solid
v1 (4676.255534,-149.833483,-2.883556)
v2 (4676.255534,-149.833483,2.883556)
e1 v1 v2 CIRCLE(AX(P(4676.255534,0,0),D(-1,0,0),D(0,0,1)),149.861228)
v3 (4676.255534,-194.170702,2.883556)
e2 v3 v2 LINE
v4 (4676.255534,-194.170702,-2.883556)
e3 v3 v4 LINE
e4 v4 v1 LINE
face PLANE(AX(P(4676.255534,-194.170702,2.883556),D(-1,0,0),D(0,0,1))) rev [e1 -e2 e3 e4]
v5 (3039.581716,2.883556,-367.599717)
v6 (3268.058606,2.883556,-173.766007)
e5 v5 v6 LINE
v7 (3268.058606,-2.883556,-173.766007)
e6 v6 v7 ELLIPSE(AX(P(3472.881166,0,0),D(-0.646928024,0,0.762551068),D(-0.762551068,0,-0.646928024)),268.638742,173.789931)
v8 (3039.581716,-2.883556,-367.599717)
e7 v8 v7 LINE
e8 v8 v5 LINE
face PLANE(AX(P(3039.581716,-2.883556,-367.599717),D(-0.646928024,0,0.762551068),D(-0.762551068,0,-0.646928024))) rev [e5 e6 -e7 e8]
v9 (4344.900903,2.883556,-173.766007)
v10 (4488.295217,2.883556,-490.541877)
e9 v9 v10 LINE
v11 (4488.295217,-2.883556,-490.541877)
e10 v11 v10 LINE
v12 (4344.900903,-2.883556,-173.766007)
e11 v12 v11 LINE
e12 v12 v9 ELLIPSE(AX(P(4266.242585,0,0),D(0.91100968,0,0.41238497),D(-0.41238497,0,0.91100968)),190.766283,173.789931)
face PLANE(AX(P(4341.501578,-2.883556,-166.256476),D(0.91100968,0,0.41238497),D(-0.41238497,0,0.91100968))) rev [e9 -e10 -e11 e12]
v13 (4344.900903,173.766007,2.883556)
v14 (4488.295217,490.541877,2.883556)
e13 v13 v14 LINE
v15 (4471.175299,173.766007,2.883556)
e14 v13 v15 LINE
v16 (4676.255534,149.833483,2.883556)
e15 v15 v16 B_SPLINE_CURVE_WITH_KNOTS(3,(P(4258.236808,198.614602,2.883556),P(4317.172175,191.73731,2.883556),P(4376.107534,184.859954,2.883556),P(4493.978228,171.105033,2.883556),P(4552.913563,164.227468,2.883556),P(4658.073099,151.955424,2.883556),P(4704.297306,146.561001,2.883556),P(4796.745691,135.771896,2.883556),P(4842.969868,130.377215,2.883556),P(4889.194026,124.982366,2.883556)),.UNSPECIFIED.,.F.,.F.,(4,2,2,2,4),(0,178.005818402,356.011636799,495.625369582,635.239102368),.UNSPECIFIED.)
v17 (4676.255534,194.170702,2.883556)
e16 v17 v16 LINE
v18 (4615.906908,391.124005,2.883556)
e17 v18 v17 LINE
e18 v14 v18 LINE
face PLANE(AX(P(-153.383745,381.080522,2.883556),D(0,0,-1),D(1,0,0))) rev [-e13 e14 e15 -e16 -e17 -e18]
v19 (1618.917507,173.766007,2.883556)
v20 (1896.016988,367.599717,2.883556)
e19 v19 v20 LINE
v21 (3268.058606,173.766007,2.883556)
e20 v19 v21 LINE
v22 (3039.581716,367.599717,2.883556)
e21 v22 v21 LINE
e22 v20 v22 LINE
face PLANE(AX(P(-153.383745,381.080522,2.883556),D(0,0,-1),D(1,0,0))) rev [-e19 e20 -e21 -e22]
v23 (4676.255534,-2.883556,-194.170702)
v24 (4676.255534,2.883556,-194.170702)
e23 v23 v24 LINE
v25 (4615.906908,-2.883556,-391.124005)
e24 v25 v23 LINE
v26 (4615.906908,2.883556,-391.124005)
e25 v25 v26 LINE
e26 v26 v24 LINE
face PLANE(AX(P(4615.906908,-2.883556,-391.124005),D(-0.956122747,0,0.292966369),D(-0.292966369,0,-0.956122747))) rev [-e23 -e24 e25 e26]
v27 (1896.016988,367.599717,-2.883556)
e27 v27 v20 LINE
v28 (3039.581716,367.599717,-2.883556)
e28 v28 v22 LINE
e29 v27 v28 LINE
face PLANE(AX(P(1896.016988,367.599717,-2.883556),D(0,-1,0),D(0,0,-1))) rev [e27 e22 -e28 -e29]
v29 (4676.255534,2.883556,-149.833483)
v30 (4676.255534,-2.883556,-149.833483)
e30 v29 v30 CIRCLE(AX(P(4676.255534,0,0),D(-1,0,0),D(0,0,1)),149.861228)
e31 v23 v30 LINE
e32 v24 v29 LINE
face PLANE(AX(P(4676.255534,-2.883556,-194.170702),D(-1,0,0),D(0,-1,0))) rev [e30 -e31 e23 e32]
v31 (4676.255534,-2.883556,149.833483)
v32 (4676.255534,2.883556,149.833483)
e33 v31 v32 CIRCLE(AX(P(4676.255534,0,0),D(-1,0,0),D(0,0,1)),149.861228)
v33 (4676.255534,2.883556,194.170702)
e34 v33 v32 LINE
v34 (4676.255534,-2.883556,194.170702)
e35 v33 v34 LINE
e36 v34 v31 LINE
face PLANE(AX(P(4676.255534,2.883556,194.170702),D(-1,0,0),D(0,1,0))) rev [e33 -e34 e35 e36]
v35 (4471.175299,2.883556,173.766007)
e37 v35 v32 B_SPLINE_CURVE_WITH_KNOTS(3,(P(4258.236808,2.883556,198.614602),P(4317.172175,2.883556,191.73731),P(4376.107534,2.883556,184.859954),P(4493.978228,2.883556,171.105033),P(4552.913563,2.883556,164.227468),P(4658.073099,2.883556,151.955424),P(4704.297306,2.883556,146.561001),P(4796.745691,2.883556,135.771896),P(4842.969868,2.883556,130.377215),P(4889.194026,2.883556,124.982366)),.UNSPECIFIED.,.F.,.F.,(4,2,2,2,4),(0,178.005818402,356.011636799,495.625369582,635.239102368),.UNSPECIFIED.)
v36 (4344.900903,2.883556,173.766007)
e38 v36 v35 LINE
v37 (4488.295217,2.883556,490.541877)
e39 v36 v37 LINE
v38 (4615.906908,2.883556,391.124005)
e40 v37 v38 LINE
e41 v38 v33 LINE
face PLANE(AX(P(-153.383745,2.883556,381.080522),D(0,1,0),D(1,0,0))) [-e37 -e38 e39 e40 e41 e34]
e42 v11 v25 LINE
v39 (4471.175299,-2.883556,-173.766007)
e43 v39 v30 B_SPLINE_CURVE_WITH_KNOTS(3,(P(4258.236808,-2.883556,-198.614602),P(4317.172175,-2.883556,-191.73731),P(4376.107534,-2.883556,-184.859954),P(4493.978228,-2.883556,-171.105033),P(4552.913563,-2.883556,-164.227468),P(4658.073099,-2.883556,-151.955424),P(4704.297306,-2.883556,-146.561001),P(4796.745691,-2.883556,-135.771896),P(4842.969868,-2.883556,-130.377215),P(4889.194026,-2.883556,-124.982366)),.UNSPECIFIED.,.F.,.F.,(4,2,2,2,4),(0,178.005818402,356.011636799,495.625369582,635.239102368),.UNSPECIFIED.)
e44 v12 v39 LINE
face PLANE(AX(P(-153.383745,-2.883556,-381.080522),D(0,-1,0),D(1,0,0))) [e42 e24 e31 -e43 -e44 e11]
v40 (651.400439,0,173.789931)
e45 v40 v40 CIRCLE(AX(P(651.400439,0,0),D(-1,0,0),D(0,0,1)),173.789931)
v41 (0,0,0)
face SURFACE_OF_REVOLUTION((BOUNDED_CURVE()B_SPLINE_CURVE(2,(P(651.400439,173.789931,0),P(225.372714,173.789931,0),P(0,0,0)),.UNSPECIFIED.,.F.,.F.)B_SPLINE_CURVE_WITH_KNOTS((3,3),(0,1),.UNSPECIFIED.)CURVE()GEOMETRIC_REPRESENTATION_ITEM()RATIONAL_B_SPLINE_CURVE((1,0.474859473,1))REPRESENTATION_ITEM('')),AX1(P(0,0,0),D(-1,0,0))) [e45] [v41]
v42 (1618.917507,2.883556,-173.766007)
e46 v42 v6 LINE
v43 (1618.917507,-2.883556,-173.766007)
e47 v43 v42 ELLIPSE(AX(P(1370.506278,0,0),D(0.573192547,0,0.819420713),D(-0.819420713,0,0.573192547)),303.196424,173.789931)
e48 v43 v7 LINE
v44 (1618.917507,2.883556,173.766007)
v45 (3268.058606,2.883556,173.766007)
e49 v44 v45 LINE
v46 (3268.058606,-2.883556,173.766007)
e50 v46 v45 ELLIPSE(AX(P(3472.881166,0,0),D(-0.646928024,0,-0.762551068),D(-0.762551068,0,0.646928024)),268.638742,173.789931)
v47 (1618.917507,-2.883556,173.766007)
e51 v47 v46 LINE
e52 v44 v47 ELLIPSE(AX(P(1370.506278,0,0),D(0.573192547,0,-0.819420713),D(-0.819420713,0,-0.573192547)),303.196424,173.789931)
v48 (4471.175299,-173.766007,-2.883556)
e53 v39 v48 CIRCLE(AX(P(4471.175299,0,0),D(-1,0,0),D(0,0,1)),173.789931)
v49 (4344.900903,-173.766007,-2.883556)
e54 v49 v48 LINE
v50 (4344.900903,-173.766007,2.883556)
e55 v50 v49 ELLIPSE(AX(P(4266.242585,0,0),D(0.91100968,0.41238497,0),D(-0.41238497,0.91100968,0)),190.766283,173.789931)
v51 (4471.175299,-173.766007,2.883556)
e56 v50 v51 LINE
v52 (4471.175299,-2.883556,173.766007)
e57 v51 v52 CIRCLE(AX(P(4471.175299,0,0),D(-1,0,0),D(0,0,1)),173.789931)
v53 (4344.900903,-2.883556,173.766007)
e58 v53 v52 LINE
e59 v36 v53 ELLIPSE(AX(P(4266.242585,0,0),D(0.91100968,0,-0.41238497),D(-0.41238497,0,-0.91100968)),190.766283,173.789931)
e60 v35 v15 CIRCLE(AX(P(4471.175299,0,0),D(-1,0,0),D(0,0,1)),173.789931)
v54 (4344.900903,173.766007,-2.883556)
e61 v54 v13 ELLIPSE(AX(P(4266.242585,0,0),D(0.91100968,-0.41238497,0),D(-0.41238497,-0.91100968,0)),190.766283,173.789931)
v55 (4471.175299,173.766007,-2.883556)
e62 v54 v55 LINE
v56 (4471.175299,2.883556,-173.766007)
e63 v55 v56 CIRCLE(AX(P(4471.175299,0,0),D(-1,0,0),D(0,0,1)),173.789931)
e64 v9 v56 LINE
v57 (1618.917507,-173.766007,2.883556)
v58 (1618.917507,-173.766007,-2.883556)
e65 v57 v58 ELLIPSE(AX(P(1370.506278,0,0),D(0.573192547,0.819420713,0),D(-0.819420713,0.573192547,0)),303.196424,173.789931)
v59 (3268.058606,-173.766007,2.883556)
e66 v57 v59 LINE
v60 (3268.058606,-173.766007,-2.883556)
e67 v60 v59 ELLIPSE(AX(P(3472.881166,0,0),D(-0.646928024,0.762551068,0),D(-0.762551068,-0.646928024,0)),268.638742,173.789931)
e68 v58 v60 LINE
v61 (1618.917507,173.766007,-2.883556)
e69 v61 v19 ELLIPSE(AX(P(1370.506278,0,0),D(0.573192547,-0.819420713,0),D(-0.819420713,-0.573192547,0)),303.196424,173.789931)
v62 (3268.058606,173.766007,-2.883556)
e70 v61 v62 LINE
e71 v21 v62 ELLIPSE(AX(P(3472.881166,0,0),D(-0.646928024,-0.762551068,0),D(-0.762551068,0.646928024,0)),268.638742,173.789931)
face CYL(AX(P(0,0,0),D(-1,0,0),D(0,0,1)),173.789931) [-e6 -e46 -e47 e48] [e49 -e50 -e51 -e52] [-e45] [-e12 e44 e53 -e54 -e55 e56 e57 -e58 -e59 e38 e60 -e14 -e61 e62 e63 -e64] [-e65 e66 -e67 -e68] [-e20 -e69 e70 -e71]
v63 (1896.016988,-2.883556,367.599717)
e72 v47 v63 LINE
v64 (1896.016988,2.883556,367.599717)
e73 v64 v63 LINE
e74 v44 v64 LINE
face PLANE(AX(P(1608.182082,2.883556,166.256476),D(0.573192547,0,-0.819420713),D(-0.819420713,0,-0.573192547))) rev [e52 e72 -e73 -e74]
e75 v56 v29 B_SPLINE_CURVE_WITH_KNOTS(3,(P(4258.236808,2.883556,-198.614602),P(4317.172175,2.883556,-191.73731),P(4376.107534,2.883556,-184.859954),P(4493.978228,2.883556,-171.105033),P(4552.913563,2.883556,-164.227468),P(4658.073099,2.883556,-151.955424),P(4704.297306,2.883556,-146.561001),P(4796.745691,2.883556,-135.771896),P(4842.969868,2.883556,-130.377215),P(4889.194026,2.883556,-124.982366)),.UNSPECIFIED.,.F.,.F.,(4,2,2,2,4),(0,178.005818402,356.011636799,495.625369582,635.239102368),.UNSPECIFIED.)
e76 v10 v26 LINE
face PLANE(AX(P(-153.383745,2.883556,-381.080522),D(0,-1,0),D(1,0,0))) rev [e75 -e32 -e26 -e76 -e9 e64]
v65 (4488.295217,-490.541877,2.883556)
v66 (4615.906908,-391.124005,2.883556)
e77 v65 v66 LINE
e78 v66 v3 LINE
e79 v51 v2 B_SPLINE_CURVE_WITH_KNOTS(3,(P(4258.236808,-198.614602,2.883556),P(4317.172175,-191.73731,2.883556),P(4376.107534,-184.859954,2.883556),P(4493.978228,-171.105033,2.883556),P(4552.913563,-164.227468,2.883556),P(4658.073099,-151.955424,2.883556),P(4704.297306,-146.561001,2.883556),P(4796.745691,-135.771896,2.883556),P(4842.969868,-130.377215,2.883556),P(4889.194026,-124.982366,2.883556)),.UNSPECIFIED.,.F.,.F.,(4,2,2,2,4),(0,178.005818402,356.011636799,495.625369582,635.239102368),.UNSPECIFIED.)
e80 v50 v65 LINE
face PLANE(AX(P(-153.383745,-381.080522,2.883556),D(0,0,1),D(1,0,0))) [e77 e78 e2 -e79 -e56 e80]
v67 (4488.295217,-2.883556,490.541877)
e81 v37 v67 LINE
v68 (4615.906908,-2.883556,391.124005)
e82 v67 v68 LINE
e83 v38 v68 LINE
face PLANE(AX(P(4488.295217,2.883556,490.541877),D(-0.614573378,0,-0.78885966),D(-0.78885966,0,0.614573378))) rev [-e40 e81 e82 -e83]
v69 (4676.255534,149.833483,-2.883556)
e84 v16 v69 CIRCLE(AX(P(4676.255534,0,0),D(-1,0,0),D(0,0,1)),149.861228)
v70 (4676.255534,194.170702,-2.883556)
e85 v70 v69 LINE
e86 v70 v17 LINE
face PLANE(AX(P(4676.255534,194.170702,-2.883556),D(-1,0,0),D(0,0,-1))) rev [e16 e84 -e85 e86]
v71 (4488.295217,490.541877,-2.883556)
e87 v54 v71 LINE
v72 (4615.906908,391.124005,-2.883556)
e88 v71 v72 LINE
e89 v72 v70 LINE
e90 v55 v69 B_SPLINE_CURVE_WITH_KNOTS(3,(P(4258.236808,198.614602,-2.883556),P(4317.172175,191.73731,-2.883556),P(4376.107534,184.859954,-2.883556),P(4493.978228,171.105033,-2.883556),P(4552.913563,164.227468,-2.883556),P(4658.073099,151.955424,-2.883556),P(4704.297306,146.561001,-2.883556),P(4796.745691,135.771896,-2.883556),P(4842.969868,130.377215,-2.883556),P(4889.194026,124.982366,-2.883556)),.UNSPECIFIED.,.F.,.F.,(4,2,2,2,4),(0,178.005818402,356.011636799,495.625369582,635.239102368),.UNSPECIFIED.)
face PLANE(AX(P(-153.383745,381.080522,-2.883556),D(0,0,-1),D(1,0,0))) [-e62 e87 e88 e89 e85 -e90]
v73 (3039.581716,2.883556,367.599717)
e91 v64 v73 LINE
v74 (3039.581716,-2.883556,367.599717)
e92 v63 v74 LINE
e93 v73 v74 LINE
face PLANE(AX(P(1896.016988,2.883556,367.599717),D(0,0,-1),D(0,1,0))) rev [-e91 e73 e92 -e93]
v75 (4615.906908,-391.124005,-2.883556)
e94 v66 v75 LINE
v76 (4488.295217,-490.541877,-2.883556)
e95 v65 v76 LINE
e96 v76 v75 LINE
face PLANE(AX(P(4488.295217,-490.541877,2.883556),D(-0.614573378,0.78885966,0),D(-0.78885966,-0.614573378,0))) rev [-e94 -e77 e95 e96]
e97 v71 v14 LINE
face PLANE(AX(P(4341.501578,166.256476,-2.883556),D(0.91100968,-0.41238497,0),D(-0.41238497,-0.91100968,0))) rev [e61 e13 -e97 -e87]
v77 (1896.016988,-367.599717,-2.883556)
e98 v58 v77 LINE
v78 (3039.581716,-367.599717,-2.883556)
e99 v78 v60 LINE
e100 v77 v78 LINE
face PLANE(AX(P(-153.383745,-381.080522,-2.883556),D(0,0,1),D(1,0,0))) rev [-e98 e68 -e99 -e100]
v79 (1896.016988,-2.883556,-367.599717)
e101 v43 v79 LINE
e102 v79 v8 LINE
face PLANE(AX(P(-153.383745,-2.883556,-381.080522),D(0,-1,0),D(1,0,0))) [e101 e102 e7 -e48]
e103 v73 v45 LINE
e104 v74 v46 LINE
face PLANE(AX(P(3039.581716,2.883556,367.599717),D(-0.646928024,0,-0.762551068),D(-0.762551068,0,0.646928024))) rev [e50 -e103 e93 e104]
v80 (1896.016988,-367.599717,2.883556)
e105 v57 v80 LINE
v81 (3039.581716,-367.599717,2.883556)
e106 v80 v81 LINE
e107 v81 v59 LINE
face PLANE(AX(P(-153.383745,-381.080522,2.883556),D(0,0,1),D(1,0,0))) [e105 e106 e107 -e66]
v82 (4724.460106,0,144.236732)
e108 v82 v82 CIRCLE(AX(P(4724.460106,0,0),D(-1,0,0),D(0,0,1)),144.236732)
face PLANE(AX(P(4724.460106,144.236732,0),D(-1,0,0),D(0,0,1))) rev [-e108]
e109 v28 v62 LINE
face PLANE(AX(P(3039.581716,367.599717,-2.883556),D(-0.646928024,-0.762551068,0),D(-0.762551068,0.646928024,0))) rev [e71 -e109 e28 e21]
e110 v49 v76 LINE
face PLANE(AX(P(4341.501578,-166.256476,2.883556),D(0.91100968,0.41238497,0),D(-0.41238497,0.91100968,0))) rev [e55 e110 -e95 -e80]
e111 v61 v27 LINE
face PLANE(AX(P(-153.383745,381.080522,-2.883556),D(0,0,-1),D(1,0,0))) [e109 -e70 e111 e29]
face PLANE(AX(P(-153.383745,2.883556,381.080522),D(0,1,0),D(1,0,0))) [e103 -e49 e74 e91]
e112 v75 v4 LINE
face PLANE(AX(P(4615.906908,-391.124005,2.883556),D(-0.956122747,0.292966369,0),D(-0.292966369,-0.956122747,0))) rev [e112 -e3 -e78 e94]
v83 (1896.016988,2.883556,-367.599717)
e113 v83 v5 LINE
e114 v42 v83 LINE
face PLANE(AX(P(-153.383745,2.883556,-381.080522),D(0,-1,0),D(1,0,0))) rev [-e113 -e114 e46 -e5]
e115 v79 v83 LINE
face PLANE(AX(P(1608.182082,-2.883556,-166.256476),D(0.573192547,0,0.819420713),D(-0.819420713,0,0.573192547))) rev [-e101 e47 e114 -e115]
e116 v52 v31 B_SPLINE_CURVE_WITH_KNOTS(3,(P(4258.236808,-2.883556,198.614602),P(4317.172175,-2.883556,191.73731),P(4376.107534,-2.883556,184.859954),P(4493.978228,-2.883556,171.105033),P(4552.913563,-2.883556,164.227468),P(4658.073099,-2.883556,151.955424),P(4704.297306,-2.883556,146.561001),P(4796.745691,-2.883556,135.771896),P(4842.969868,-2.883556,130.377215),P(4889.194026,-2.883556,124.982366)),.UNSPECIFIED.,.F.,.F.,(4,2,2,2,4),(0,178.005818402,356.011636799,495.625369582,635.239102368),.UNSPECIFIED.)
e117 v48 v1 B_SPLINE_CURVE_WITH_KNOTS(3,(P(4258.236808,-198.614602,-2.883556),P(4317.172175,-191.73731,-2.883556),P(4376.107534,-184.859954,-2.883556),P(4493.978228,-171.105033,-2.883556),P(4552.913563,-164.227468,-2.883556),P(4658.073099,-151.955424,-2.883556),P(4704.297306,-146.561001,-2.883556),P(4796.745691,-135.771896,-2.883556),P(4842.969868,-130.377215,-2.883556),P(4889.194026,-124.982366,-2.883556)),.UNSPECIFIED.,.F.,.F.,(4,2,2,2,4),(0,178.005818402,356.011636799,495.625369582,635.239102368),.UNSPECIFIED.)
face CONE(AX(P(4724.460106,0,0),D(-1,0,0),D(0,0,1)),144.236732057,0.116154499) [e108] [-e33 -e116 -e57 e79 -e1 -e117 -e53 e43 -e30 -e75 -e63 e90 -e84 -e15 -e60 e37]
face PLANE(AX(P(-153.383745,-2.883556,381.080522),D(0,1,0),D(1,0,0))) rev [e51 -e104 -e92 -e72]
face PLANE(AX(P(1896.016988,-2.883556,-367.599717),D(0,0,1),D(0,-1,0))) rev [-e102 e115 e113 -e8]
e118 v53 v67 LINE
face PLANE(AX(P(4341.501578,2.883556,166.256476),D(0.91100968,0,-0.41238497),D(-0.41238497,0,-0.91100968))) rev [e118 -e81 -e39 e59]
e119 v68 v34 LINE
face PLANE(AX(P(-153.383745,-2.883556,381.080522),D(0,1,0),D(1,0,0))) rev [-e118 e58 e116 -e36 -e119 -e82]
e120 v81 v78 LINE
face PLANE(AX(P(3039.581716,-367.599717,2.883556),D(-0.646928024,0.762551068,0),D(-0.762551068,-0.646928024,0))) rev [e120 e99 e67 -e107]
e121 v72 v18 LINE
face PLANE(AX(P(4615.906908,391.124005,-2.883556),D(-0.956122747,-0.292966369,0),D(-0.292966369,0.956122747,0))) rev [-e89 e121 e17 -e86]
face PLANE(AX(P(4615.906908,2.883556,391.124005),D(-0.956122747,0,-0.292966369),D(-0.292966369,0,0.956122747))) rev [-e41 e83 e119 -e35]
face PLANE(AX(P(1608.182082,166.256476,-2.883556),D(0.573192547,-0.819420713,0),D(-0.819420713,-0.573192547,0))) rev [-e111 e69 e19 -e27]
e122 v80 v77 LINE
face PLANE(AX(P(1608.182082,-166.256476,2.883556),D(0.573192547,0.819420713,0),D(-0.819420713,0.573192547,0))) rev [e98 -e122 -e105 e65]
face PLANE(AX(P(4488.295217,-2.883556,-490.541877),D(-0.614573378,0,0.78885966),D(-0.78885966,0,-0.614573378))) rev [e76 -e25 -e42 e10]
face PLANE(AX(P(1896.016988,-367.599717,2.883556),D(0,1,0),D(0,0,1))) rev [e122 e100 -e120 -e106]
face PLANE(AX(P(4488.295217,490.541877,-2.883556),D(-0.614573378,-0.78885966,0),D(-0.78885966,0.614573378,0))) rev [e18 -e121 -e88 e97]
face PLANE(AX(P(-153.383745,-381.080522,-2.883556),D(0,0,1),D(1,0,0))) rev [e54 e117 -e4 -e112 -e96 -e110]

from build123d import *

# Parameters (mm, degrees)
BOSS_EXTRUDE1_DEPTH   = 0.545404963
BOSS_EXTRUDE1_2_DEPTH = 0.545404963
SCALE2_SCALE          = 5.287
CIRPATTERN1_START     = 378.196965722
CIRPATTERN1_DEPTH     = 5.767112081
CIRPATTERN1_START_2   = -2.88355604
CIRPATTERN1_2_DEPTH   = 5.76711208


with BuildPart() as part:
    # Sketch1 → Revolve1 (revolve)
    with BuildSketch(Plane.XY, mode=Mode.PRIVATE) as revolve1_sk:
        with BuildLine():
            Line((152.219440928, 104.949962647), (874.703810113, 104.949962647))
            Line((874.703810113, 104.949962647), (922.610904161, 99.360176626))
            Line((922.610904161, 99.360176626), (922.610904161, 72.078782251))
            Line((922.610904161, 72.078782251), (29.011489455, 72.078782251))
            add(Edge.make_bspline(
                [(29.011489455, 72.078782251), (71.639201594, 104.949962647), (152.219440928, 104.949962647)],
                knots=[0, 0, 0, 1, 1, 1], degree=2, weights=[1, 0.474859473, 1]))
        make_face()
    revolve(revolve1_sk.sketch.rotate(Axis((29.011489455, 72.078782251, 0), (1, 0, 0)), 90), axis=Axis((29.011489455, 72.078782251, 0), (1, 0, 0)))


with BuildPart() as body_2:
    # Sketch2 → Boss-Extrude1 (new, symmetric)
    with BuildSketch(Plane.XY):
        Polygon((850.176909973, 50.048019845), (913.4933382, 50.048019845), (913.4933382, 35.352717878), (902.078807117, -1.899656367), (877.941925748, -20.703868936), (850.176909973, 40.632503532), align=None)
    extrude(amount=BOSS_EXTRUDE1_DEPTH, both=True)


with BuildPart() as body_3:
    # Sketch2 → Boss-Extrude1 2 (new, symmetric)
    with BuildSketch(Plane.XY):
        Polygon((333.188164698, 40.632503532), (387.630174448, 2.549802235), (603.927645349, 2.549802235), (648.816726438, 40.632503532), (648.816726438, 50.048019845), (333.188164698, 50.048019845), align=None)
    extrude(amount=BOSS_EXTRUDE1_2_DEPTH, both=True)


with BuildPart() as part_1:
    # Scale2: scaled about (0, 0, 0)
    add(part.part.scale(SCALE2_SCALE))

    # CirPattern1: read off the stored shape, not the designer's step
    # CirPattern1 outline → CirPattern1 (add)
    with BuildSketch(Plane(origin=(0, 0, 0), x_dir=(1, 0, 0), z_dir=(0, 1, 0)).offset(CIRPATTERN1_START)):
        Polygon((4419.626329355, 0), (4641.678961432, -490.541876827), (4769.290653226, -391.124004973), (4829.639279064, -194.170702341), (4829.639279064, 194.170702341), (4769.290653226, 391.124004973), (4641.678961432, 490.541876827), align=None)
        Polygon((3192.965460961, -367.599717344), (3626.264910808, 0), (3192.965460961, 367.599717344), (2049.400732307, 367.599717344), (1772.301251505, 173.766006848), (1771, 172.8557691), (1771, -172.8557691), (1772.301251505, -173.766006848), (2049.400732307, -367.599717344), align=None)
    extrude(amount=CIRPATTERN1_DEPTH)

    # CirPattern1 2 outline → CirPattern1 2 (add)
    with BuildSketch(Plane.XY.offset(CIRPATTERN1_START_2)):
        Polygon((4829.639279064, 377), (4829.639279064, 575.251224103), (4769.290653226, 772.204526736), (4641.678961432, 871.62239859), (4417.779207548, 377), align=None)
        Polygon((1771, 377), (3631.074729074, 377), (3192.965460961, 748.680239107), (2049.400732307, 748.680239107), (1772.301251505, 554.846528611), (1771, 553.936290863), align=None)
    extrude(amount=CIRPATTERN1_2_DEPTH)


with BuildPart() as body_3_1:
    # Scale2: scaled about (0, 0, 0)
    add(body_3.part.scale(SCALE2_SCALE))


with BuildPart() as body_2_1:
    # Scale2: scaled about (0, 0, 0)
    add(body_2.part.scale(SCALE2_SCALE))


with BuildPart() as part_2:
    add(part_1.part)

    # Combine1: union body 3, body 2
    add(body_3_1.part)
    add(body_2_1.part)


with BuildPart() as part_3:
    # Body-Move/Copy1: read off the stored shape, not the designer's step
    # Body-Move/Copy1: moved
    add(part_2.part.moved(Location((-153.3837447, -381.0805218, 0))))


solid = part_3.part
